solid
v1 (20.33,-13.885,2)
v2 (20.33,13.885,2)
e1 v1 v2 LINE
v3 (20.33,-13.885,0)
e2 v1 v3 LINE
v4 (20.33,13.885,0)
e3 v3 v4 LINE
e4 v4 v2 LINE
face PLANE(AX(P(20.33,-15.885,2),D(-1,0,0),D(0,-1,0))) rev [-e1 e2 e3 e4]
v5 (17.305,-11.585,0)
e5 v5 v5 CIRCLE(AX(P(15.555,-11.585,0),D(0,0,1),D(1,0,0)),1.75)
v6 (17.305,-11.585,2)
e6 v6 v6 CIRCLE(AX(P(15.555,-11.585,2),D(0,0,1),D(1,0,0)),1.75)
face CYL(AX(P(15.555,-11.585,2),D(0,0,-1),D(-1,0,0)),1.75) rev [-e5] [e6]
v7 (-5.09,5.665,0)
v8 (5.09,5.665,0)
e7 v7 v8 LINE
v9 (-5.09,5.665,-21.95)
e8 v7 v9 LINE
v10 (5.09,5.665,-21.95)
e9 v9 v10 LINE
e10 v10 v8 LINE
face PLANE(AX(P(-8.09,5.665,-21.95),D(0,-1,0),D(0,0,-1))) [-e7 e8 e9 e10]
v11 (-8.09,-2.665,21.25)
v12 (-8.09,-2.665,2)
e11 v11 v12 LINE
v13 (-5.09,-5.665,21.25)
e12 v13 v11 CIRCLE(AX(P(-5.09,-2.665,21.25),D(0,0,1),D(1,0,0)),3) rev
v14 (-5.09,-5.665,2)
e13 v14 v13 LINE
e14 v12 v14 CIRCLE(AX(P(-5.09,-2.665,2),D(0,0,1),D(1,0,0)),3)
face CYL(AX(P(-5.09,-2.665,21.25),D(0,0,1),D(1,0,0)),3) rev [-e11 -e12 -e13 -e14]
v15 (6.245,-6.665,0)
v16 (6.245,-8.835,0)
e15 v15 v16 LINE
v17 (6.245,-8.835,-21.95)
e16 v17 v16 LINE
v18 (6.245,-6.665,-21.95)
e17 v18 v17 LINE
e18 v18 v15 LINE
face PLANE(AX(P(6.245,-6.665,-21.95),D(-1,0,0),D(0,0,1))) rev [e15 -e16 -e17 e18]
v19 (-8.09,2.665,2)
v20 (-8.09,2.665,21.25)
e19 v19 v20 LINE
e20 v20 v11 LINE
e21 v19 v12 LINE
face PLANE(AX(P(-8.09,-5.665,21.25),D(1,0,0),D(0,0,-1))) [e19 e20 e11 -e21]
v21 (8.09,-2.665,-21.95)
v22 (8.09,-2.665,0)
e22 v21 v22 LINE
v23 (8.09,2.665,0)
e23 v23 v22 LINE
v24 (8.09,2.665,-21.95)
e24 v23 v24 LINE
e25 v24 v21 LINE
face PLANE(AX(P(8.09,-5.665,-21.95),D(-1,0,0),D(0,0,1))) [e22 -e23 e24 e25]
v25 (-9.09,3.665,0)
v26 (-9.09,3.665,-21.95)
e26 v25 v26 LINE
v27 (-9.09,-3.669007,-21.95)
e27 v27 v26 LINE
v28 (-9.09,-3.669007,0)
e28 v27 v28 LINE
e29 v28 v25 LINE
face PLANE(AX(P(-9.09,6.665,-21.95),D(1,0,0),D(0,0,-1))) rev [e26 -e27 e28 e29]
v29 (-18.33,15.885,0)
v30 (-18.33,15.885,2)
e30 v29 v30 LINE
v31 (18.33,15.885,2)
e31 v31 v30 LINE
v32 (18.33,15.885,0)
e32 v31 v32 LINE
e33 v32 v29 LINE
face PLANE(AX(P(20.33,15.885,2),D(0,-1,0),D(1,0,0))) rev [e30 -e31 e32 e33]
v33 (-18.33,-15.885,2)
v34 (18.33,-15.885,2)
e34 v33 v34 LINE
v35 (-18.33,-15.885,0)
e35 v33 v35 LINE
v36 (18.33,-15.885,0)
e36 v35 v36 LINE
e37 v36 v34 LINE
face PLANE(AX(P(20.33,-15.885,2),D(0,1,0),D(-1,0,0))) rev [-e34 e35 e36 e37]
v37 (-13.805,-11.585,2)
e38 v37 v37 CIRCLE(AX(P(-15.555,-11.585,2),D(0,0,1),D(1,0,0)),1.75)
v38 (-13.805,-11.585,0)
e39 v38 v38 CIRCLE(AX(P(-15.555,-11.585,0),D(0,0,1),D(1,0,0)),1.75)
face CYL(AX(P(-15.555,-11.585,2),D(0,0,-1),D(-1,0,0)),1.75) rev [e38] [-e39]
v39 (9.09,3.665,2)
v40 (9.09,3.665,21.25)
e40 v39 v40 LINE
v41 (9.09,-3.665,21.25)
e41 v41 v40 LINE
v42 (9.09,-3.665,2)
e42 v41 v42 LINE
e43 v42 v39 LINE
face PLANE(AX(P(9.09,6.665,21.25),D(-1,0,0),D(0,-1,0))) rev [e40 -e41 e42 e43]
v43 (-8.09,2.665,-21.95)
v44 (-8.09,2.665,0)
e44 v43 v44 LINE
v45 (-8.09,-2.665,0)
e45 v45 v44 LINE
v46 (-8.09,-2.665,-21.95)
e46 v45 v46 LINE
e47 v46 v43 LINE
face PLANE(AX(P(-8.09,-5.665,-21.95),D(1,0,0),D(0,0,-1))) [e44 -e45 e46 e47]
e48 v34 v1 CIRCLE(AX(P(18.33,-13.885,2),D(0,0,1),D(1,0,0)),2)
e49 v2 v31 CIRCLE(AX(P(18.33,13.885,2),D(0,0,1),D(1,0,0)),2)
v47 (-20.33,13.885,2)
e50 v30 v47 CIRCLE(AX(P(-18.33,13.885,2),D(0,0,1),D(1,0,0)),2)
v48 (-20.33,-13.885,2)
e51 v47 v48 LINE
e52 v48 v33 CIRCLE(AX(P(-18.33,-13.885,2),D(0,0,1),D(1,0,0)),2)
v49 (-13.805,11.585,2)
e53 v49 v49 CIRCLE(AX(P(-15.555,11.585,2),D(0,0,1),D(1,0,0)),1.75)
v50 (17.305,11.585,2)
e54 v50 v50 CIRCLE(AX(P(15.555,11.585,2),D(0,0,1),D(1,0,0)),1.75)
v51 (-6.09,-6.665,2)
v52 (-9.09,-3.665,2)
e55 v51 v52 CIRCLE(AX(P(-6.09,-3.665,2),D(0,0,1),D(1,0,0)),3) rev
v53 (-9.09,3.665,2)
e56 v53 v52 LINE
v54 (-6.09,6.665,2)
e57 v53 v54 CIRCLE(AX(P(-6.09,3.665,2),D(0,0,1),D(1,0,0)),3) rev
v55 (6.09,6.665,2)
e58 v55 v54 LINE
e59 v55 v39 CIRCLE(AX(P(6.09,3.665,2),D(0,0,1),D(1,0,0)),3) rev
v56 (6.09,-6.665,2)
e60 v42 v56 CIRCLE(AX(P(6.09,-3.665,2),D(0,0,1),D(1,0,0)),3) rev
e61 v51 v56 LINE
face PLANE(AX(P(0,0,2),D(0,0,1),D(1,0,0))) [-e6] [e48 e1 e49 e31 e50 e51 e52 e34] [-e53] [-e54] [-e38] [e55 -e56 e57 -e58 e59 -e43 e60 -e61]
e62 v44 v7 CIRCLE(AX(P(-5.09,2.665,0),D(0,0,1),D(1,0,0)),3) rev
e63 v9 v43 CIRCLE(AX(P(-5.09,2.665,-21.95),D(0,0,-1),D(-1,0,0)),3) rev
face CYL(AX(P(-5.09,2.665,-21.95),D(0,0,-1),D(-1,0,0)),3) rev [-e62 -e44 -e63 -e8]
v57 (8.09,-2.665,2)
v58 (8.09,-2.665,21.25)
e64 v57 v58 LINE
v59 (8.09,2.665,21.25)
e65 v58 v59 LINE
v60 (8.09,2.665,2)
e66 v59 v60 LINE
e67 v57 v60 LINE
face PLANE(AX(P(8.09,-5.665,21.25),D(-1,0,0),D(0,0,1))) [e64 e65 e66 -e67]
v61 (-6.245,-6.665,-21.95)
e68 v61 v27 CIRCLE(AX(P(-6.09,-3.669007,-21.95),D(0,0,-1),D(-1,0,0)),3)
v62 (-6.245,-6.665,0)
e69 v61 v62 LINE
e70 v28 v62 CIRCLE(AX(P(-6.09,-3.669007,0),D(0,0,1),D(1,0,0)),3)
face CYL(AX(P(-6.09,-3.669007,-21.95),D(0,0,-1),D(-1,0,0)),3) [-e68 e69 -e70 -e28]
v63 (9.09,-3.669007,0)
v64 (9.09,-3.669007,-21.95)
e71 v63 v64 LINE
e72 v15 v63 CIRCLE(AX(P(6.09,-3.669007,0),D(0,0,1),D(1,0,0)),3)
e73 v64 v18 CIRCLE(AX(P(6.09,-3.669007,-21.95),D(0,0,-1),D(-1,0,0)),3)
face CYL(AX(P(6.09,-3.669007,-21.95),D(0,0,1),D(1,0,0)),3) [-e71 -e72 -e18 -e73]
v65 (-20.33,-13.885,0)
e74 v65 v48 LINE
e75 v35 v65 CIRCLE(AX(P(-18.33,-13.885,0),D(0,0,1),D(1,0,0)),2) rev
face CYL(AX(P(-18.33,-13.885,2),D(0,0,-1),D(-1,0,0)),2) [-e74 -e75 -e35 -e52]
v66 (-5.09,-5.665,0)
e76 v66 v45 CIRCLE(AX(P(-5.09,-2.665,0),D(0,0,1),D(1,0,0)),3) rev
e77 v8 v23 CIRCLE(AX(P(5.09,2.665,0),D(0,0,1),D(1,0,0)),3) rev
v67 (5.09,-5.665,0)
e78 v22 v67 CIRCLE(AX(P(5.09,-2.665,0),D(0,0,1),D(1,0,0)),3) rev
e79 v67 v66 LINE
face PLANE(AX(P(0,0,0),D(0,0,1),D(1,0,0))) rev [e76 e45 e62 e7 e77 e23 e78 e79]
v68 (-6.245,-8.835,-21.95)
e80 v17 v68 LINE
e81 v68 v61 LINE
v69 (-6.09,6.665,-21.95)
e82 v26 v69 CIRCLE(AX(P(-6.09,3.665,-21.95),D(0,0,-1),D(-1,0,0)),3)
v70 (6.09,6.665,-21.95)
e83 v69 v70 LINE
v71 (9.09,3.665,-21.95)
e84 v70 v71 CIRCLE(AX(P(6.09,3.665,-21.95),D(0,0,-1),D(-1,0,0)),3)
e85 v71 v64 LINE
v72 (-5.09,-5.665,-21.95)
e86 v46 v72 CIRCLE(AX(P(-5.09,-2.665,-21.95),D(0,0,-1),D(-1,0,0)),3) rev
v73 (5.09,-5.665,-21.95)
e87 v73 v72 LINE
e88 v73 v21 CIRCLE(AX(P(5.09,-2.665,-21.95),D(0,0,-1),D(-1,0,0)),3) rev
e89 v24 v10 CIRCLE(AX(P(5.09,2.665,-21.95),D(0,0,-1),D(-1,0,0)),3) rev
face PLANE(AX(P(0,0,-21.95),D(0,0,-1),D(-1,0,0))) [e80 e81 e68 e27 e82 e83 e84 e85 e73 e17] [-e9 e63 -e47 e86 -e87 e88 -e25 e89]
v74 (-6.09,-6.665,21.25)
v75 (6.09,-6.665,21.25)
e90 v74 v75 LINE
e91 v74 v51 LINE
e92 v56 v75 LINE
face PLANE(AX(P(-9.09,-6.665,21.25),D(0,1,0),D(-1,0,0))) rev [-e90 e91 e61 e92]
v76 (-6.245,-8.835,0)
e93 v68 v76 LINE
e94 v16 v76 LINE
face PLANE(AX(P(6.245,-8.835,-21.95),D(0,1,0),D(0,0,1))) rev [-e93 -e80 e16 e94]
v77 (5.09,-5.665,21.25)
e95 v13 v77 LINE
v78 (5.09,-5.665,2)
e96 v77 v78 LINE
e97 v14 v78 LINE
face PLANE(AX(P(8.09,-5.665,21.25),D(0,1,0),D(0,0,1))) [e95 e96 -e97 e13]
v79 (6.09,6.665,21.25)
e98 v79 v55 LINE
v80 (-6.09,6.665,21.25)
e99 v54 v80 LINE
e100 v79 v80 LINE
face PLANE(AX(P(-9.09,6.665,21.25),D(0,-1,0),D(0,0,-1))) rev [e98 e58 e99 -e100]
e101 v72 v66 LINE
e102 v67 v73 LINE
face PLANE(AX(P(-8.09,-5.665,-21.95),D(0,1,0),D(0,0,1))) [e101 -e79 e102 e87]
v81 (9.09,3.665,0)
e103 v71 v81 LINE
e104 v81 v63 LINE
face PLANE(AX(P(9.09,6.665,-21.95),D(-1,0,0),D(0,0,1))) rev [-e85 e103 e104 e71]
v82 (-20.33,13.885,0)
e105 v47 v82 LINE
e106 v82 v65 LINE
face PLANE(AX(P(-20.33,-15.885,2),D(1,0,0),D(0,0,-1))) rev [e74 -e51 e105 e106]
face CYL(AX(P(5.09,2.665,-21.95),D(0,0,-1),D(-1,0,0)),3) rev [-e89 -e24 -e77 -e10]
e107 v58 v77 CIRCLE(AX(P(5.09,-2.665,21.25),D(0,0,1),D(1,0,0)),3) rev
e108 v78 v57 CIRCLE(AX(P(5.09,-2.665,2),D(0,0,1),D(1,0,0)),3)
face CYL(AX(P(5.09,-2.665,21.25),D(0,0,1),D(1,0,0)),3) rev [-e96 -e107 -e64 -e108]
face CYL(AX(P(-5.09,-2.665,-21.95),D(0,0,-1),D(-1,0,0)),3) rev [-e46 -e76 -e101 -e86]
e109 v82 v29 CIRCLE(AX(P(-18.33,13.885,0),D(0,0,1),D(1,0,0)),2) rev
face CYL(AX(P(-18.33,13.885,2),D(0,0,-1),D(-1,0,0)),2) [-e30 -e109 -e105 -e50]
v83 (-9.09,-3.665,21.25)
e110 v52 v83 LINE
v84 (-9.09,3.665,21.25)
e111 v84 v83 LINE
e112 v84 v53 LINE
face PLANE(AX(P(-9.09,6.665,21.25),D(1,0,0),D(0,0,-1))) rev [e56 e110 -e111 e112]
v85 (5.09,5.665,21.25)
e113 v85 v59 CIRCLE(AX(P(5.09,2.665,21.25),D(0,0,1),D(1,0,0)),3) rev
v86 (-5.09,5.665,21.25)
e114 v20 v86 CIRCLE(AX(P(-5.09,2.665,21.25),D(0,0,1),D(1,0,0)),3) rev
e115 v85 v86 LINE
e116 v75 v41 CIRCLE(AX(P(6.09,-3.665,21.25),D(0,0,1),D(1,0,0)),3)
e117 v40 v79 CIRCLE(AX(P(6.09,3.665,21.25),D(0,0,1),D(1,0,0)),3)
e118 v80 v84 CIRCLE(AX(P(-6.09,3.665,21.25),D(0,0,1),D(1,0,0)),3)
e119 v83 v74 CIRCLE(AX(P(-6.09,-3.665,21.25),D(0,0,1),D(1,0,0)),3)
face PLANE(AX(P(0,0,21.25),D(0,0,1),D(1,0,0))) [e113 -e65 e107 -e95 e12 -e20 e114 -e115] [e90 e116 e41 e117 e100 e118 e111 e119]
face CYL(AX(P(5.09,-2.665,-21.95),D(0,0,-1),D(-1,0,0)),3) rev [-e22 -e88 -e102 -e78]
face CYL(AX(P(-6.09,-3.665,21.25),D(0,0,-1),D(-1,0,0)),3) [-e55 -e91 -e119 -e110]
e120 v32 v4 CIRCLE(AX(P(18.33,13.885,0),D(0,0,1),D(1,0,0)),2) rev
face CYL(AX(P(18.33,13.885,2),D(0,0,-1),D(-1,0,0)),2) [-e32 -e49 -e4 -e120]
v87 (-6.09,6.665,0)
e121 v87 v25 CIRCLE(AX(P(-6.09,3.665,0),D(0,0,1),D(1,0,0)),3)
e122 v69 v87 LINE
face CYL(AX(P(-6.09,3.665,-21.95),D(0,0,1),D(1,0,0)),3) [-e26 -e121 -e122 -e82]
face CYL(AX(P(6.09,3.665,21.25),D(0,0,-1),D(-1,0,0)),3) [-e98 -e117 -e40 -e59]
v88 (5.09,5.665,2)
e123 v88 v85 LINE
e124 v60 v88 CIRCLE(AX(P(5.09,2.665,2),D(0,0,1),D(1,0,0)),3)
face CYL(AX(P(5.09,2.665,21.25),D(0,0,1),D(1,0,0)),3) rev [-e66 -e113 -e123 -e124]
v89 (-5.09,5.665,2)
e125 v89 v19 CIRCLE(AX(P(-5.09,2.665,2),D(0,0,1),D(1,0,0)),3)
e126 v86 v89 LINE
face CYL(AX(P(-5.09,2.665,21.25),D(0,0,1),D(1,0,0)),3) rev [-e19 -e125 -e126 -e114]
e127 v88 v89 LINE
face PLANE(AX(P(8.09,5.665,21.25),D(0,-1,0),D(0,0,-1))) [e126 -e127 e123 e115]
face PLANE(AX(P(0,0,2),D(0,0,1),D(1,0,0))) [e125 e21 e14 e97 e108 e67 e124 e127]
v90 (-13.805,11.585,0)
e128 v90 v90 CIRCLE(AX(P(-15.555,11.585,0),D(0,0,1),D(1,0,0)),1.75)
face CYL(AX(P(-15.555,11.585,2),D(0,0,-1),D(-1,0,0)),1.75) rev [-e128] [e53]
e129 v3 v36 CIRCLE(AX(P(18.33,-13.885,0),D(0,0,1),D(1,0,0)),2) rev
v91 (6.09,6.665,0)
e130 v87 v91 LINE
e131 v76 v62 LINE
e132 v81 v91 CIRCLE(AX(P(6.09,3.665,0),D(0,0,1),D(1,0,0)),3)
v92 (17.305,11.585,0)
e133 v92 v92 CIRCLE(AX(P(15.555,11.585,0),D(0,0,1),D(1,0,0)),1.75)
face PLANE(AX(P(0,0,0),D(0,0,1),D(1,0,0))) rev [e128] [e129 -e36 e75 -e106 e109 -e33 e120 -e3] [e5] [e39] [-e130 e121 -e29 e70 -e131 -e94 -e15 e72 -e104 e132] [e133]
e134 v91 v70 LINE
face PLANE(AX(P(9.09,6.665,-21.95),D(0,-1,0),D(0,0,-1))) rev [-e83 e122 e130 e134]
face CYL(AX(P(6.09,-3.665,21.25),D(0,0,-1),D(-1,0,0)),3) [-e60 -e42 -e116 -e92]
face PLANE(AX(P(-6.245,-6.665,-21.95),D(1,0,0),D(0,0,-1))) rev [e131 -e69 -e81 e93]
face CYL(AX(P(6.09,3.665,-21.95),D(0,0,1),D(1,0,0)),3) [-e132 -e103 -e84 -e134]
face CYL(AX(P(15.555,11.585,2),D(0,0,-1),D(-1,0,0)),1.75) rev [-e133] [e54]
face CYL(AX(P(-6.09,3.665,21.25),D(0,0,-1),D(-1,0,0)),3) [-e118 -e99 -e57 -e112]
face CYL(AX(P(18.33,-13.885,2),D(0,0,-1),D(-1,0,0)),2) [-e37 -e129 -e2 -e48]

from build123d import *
from OCP.BRepAlgoAPI import BRepAlgoAPI_Cut
from OCP.TopTools import TopTools_ListOfShape

# Parameters (mm, degrees)
SKETCH1_W           = 40.66
SKETCH1_H           = 31.77
SKETCH1_R           = 1.75
BOSS_EXTRUDE1_DEPTH = 2
SKETCH2_W           = 16.18
SKETCH2_H           = 11.33
BOSS_EXTRUDE2_DEPTH = 21.95
SKETCH3_W           = 18.18
SKETCH3_H           = 13.33
SKETCH3_W_2         = 16.18
SKETCH3_H_2         = 11.33
BOSS_EXTRUDE3_DEPTH = 19.25
FILLET2_START       = -21.95
FILLET2_DEPTH       = 21.95
FILLET2_START_2     = 2
FILLET2_2_DEPTH     = 19.25
FILLET2_3_DEPTH     = 43.2
FILLET3_R           = 2


with BuildPart() as part:
    # Sketch1 → Boss-Extrude1 (new body)
    with BuildSketch(Plane.XY):
        Rectangle(SKETCH1_W, SKETCH1_H)
        with Locations((-15.555, 11.585)):
            Circle(SKETCH1_R, mode=Mode.SUBTRACT)
        with Locations((-15.555, -11.585)):
            Circle(SKETCH1_R, mode=Mode.SUBTRACT)
        with Locations((15.555, -11.585)):
            Circle(SKETCH1_R, mode=Mode.SUBTRACT)
        with Locations((15.555, 11.585)):
            Circle(SKETCH1_R, mode=Mode.SUBTRACT)
    extrude(amount=BOSS_EXTRUDE1_DEPTH)

    # Sketch2 → Boss-Extrude2 (add)
    with BuildSketch(Plane(origin=(0, 0, 0), x_dir=(-1, 0, 0), z_dir=(0, 0, -1))):
        Polygon((6.245, -6.665), (9.09, -6.665), (9.09, 6.665), (-9.09, 6.665), (-9.09, -6.665), (-6.245, -6.665), (-6.245, -8.835), (6.245, -8.835), align=None)
        Rectangle(SKETCH2_W, SKETCH2_H, mode=Mode.SUBTRACT)
    extrude(amount=BOSS_EXTRUDE2_DEPTH)

    # Sketch3 → Boss-Extrude3 (add)
    with BuildSketch(Plane.XY.offset(2)):
        Rectangle(SKETCH3_W, SKETCH3_H)
        Rectangle(SKETCH3_W_2, SKETCH3_H_2, mode=Mode.SUBTRACT)
    extrude(amount=BOSS_EXTRUDE3_DEPTH)


with BuildPart() as fillet2_tool:
    # Fillet2: read off the stored shape, not the designer's step
    # Fillet2 outline → Fillet2 (new body)
    with BuildSketch(Plane.XY.offset(FILLET2_START)):
        with BuildLine():
            Line((-9.09, -6.665), (-6.245, -6.665))
            ThreePointArc((-6.245, -6.665), (-8.265430992, -5.734799668), (-9.09, -3.669006842))
            Line((-9.09, -3.669006842), (-9.09, -6.665))
        make_face()
        with BuildLine():
            Line((-9.09, 6.665), (-9.09, 3.665))
            ThreePointArc((-9.09, 3.665), (-8.211320344, 5.786320344), (-6.09, 6.665))
            Line((-6.09, 6.665), (-9.09, 6.665))
        make_face()
        with BuildLine():
            Line((9.09, -6.665), (9.09, -3.669006842))
            ThreePointArc((9.09, -3.669006842), (8.265430992, -5.734799668), (6.245, -6.665))
            Line((6.245, -6.665), (9.09, -6.665))
        make_face()
        with BuildLine():
            Line((9.09, 6.665), (6.09, 6.665))
            ThreePointArc((6.09, 6.665), (8.211320344, 5.786320344), (9.09, 3.665))
            Line((9.09, 3.665), (9.09, 6.665))
        make_face()
    extrude(amount=FILLET2_DEPTH)


with BuildPart() as part_1:
    add(part.part)

    # Fillet2: cut by fillet2_tool, with a tolerance
    fillet2_stock = TopTools_ListOfShape()
    fillet2_stock.Append(part_1.part.wrapped)
    fillet2_tools = TopTools_ListOfShape()
    fillet2_tools.Append(fillet2_tool.part.wrapped)
    fillet2_cut = BRepAlgoAPI_Cut()
    fillet2_cut.SetArguments(fillet2_stock)
    fillet2_cut.SetTools(fillet2_tools)
    fillet2_cut.SetFuzzyValue(0.00001)
    fillet2_cut.Build()
    add(Compound.cast(fillet2_cut.Shape()).solids(), mode=Mode.REPLACE)


with BuildPart() as fillet2_2_tool:
    # Fillet2 2 outline → Fillet2 2 (new body)
    with BuildSketch(Plane.XY.offset(FILLET2_START_2)):
        with BuildLine():
            Line((-9.09, -6.665), (-6.09, -6.665))
            ThreePointArc((-6.09, -6.665), (-8.209903239, -5.787736503), (-9.089997324, -3.669006838))
            Line((-9.089997324, -3.669006838), (-9.09, -6.665))
        make_face()
        with BuildLine():
            ThreePointArc((9.089997324, -3.669006838), (8.209903239, -5.787736503), (6.09, -6.665))
            Line((6.09, -6.665), (9.09, -6.665))
            Line((9.09, -6.665), (9.089997324, -3.669006838))
        make_face()
        with BuildLine():
            Line((-9.09, 6.665), (-9.09, 3.665))
            ThreePointArc((-9.09, 3.665), (-8.211320344, 5.786320344), (-6.09, 6.665))
            Line((-6.09, 6.665), (-9.09, 6.665))
        make_face()
        with BuildLine():
            Line((9.09, 6.665), (6.09, 6.665))
            ThreePointArc((6.09, 6.665), (8.211320344, 5.786320344), (9.09, 3.665))
            Line((9.09, 3.665), (9.09, 6.665))
        make_face()
    extrude(amount=FILLET2_2_DEPTH)


with BuildPart() as part_2:
    add(part_1.part)

    # Fillet2 2: cut by fillet2_2_tool, with a tolerance
    fillet2_2_stock = TopTools_ListOfShape()
    fillet2_2_stock.Append(part_2.part.wrapped)
    fillet2_2_tools = TopTools_ListOfShape()
    fillet2_2_tools.Append(fillet2_2_tool.part.wrapped)
    fillet2_2_cut = BRepAlgoAPI_Cut()
    fillet2_2_cut.SetArguments(fillet2_2_stock)
    fillet2_2_cut.SetTools(fillet2_2_tools)
    fillet2_2_cut.SetFuzzyValue(0.00001)
    fillet2_2_cut.Build()
    add(Compound.cast(fillet2_2_cut.Shape()).solids(), mode=Mode.REPLACE)


with BuildPart() as fillet2_3_tool:
    # Fillet2 3 outline → Fillet2 3 (new body)
    with BuildSketch(Plane.XY.offset(FILLET2_START)):
        with BuildLine():
            Line((-8.09, -5.665), (-5.09, -5.665))
            ThreePointArc((-5.09, -5.665), (-7.211320344, -4.786320344), (-8.09, -2.665))
            Line((-8.09, -2.665), (-8.09, -5.665))
        make_face()
        with BuildLine():
            ThreePointArc((8.09, -2.665), (7.211320344, -4.786320344), (5.09, -5.665))
            Line((5.09, -5.665), (8.09, -5.665))
            Line((8.09, -5.665), (8.09, -2.665))
        make_face()
        with BuildLine():
            Line((-8.09, 5.665), (-8.09, 2.665))
            ThreePointArc((-8.09, 2.665), (-7.211320344, 4.786320344), (-5.09, 5.665))
            Line((-5.09, 5.665), (-8.09, 5.665))
        make_face()
        with BuildLine():
            ThreePointArc((5.09, 5.665), (7.211320344, 4.786320344), (8.09, 2.665))
            Line((8.09, 2.665), (8.09, 5.665))
            Line((8.09, 5.665), (5.09, 5.665))
        make_face()
    extrude(amount=FILLET2_3_DEPTH)


with BuildPart() as part_3:
    add(part_2.part)


with BuildPart() as part_4:
    # Fillet2 3: joined with fillet2_3_tool
    add(part_3.part.fuse(fillet2_3_tool.part, tol=0.00001))

    # Fillet3
    fillet3_edges = [part_4.edges().sort_by_distance(p)[0] for p in [
        (-20.33, 15.885, 1),
        (20.33, 15.885, 1),
        (20.33, -15.885, 1),
        (-20.33, -15.885, 1),
    ]]
    fillet(fillet3_edges, radius=FILLET3_R)


solid = part_4.part
